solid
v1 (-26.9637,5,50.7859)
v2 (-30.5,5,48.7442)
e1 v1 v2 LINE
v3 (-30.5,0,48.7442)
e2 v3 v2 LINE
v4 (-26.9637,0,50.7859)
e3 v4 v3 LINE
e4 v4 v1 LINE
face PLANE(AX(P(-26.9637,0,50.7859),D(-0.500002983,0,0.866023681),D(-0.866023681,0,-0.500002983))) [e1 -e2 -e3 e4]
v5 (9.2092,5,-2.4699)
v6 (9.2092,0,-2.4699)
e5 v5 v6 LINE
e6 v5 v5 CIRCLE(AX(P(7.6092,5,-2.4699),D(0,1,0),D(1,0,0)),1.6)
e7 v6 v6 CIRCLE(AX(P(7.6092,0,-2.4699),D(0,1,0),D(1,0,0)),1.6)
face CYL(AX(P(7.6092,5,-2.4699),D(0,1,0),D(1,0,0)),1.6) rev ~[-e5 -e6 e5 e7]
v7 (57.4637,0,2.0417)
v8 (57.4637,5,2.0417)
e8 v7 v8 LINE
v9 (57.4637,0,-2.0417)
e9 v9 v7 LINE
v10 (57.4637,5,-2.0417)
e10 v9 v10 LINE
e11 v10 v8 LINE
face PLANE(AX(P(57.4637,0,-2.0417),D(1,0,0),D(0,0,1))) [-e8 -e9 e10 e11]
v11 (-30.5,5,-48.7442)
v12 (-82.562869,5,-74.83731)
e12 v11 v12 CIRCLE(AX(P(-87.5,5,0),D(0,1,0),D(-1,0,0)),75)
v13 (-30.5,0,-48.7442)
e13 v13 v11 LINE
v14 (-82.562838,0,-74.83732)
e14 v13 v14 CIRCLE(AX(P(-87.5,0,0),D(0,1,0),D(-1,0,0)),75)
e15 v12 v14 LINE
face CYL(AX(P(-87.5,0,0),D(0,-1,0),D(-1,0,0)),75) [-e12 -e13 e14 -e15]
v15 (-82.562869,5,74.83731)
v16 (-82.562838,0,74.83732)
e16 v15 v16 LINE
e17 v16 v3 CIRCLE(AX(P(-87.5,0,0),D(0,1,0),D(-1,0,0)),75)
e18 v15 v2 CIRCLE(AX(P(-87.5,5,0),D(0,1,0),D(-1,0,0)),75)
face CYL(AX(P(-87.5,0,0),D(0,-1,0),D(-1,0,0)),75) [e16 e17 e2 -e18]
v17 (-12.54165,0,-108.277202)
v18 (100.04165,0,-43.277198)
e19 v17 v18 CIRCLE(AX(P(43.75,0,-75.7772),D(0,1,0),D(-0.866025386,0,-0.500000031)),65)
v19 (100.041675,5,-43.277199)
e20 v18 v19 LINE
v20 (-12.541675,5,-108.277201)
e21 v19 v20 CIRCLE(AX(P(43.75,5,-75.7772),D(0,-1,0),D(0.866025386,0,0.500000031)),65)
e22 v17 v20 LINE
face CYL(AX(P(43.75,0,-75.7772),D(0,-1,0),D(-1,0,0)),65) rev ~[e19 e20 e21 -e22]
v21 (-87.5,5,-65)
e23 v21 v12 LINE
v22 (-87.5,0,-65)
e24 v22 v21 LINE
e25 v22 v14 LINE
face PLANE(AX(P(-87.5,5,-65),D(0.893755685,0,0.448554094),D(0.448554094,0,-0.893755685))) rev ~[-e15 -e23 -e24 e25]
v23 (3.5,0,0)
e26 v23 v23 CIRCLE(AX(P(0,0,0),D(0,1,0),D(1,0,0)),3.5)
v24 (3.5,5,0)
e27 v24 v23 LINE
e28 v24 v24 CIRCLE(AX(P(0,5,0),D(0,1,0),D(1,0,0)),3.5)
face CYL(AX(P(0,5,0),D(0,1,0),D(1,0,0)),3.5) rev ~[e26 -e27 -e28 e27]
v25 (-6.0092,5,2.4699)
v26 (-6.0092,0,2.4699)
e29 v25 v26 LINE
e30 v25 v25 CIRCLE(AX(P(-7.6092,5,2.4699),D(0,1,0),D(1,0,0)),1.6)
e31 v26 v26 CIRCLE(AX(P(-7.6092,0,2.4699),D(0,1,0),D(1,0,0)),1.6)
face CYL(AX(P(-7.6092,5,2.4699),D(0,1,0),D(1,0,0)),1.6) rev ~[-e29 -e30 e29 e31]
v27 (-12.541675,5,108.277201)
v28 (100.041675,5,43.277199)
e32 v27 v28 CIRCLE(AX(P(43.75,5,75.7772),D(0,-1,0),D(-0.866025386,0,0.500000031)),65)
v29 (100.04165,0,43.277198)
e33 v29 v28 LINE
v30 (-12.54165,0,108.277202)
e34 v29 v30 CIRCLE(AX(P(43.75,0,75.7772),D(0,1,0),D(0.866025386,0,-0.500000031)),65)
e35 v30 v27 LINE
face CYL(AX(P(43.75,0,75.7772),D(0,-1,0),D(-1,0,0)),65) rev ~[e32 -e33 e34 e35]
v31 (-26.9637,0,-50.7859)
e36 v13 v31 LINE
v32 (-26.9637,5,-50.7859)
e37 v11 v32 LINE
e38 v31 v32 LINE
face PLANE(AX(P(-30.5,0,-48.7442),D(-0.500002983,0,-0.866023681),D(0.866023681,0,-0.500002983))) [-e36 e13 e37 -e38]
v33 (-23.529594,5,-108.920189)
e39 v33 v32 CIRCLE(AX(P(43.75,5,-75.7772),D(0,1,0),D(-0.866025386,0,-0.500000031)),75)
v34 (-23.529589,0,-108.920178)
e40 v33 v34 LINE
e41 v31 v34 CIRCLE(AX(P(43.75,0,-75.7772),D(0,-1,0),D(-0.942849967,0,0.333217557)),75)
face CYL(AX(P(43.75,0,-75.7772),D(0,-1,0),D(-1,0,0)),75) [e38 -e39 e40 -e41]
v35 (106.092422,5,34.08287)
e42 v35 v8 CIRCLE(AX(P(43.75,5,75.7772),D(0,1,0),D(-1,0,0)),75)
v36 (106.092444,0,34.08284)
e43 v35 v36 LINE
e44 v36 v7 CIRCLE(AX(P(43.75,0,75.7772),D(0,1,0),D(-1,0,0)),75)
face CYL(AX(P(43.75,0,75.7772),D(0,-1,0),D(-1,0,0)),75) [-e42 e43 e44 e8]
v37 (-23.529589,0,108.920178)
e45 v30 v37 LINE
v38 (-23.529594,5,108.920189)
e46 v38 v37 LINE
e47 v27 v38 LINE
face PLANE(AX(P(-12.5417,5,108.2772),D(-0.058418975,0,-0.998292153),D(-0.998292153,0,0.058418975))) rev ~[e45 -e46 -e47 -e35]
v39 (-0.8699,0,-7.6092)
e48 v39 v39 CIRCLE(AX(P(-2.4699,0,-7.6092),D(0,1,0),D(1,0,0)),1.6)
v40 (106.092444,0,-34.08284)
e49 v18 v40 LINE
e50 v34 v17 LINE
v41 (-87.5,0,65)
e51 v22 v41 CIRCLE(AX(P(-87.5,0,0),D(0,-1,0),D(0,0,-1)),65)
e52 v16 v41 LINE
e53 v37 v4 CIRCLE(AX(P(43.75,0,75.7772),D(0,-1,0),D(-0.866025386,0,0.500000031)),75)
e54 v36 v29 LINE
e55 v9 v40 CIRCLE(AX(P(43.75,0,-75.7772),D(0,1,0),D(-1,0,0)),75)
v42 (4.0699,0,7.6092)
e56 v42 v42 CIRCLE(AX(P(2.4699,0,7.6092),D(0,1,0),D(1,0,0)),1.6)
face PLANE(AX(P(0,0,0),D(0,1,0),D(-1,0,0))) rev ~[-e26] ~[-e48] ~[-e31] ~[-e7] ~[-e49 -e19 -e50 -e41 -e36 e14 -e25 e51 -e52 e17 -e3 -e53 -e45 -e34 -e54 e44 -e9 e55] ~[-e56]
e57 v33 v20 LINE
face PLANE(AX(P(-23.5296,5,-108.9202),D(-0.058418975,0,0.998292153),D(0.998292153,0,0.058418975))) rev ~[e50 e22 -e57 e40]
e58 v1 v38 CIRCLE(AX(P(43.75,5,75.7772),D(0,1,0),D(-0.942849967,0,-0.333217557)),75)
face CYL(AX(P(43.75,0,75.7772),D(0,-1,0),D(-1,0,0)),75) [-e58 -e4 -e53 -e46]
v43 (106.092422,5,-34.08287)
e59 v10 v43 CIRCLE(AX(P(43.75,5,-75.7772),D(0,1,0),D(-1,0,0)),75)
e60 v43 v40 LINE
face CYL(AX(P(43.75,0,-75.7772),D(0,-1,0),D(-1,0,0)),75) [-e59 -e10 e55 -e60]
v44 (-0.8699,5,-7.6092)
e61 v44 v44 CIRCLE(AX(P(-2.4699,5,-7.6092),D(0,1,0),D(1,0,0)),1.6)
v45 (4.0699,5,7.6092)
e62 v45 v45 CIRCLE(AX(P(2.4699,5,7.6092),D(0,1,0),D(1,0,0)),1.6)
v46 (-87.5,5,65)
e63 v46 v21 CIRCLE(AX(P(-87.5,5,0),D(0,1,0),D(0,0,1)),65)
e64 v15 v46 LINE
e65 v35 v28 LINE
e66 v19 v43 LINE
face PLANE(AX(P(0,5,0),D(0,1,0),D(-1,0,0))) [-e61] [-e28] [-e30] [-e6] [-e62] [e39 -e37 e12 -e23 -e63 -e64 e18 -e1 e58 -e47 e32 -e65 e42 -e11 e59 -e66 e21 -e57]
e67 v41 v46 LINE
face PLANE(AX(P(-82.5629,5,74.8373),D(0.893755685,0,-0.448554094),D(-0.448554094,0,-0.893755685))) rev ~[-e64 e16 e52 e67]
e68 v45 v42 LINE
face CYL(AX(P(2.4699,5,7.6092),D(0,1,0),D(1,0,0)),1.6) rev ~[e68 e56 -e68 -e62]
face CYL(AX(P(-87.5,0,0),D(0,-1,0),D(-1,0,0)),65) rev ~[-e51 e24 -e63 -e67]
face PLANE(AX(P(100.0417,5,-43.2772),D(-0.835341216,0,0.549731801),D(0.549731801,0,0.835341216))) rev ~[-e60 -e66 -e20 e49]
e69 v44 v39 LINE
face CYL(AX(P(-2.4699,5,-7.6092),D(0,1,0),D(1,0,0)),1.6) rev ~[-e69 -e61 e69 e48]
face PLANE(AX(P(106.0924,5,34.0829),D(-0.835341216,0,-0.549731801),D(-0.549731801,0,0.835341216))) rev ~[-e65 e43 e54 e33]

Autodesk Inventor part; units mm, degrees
ref_plane "YZ Plane" through (0, 0, 0) normal (1, 0, 0) x (0, 1, 0)
ref_plane "XZ Plane" through (0, 0, 0) normal (0, 1, 0) x (-1, 0, 0)
ref_plane "XY Plane" through (0, 0, 0) normal (0, 0, 1) x (1, 0, 0)
sketch "Эскиз1" plane through (0, 0, 0) normal (0, 1, 0) x (-1, 0, 0)
  circle A0 centre (0, 0) radius 152.5
  line L0 (0, 0) -> (152.5, 0)
  circle A1 centre (87.5, 0) radius 65
  circle A2 centre (-43.75, 75.7772) radius 65
  circle A3 centre (-43.75, -75.7772) radius 65
  circle A4 centre (87.5, 0) radius 75
  circle A5 centre (-43.75, 75.7772) radius 75
  circle A6 centre (-43.75, -75.7772) radius 75
  line L1 (0, 0) -> (-76.25, 132.0689)
  line L2 (0, 0) -> (-76.25, -132.0689)
  line L3 (144.5, 48.7442) -> (30.5, -48.7442)
  line L4 (-114.4637, 100.7686) -> (26.9637, 50.7859)
  line L5 (-30.0363, -149.5128) -> (-57.4637, -2.0417)
  line L6 (30.5, -48.7442) -> (26.9637, -50.7859)
  line L7 (26.9637, 50.7859) -> (30.5, 48.7442)
  line L8 (-57.4637, -2.0417) -> (-57.4637, 2.0417)
  line L9 (87.5, -75) -> (87.5, 75)
  line L10 (21.2019, 113.2772) -> (-108.7019, 38.2772)
  line L11 (-108.7019, -38.2772) -> (21.2019, -113.2772)
  point P0 (14.0693, 24.3687)
  point P1 (-28.1386, 0)
  point P2 (14.0693, -24.3687)
  point P3 (12.5, 0)
  point P4 (22.5, 0)
  point P5 (152.5, 0)
  point P6 (-6.25, 10.8253)
  point P7 (-11.25, 19.4856)
  point P8 (-76.25, 132.0689)
  point P9 (-114.4637, 100.7686)
  point P10 (-6.25, -10.8253)
  point P11 (-11.25, -19.4856)
  point P12 (-76.25, -132.0689)
  point P13 (-30.0363, -149.5128)
  point P14 (-114.4637, -100.7686)
  point P15 (-30.0363, 149.5128)
  point P16 (144.5, -48.7442)
  point P17 (152.5, 0)
  point P18 (136.9, 42.245)
  point P19 (17.5352, 54.1181)
  point P20 (-105.0352, 97.4364)
  point P21 (-114.4637, 100.7686)
  point P22 (-57.4637, -2.0417)
  point P23 (-55.6352, -11.8731)
  point P24 (-31.8648, -139.6814)
  point P25 (-30.0363, -149.5128)
  point P26 (38.1, -42.245)
  point P27 (87.5, -65)
  point P28 (87.5, 65)
  point P29 (12.5417, 108.2772)
  point P30 (-100.0417, 43.2772)
  point P31 (-57.4637, -2.0417)
  point P32 (-100.0417, -43.2772)
  point P33 (12.5417, -108.2772)
  dimension "d0" = 305
  dimension "d1" = 130
  dimension "d2" = 0
  dimension "d5" = 360
  dimension "d7" = 150
  dimension "d10" = 360
  dimension "d16" = 360
  dimension "d18" = 0
  dimension "d21" = 360
  dimension "d25" = 360
  dimension "d48" = 360
extrude "Выдавливание1" add sketch "Эскиз1" along normal blind 5 contours L9 A4 L3 A1 | L9 A1 L0 A4 | A1 L3 A4 L0 | A5 L4 A2 L10 | A4 L0 L1 A5 L7 | L11 A3 L2 A6 | L6 A6 L2 L0 A4 | L10 A2 L1 A5 | A5 L1 A2 L4 | L11 A6 L5 A3 | L2 A6 L8 A5 L1 | L5 A6 L2 A3 picked at (58.9785, -61.9188) picked at (22.0957, 93.4205) picked at (-83.1125, -20.1174)
sketch "Эскиз4" plane through (0, 5, 0) normal (0, 1, 0) x (1, 0, 0)
  circle A0 centre (0, 0) radius 3.5
  dimension "d43" = 7
extrude "Выдавливание4" cut sketch "Эскиз4" against normal blind 140
sketch "Эскиз5" plane through (0, 5, 0) normal (0, 1, 0) x (1, 0, 0)
  circle A0 centre (0, 0) radius 3.5 projected
  arc A1 (-87.5, -65) -> (-87.5, 65) centre (-87.5, 0) ccw projected
  line L0 (-87.5, -65) -> (-87.5, -69)
  line L1 (-87.5, -65) -> (-87.5, -75) projected
  circle A2 centre (0, 0) radius 111.4327
  circle A3 centre (0, 0) radius 192.7389
  dimension "d51" = 4
extrude "Выдавливание5" cut sketch "Эскиз5" against normal through all contours A3
sketch "Эскиз6" plane through (0, 5, 0) normal (0, 1, 0) x (1, 0, 0)
  line L0 (103.5058, 41.2772) -> (100.0417, 43.2772) projected
  arc A0 (57.4637, 2.0417) -> (106.0924, 34.0829) centre (43.75, 75.7772) ccw projected
  line L1 (100.0417, 43.2772) -> (106.0924, 34.0829)
  line L2 (-87.5, 65) -> (-82.5629, 74.8373)
  line L3 (-12.5417, -108.2772) -> (-23.5296, -108.9202)
  line L4 (100.0417, -43.2772) -> (103.5058, -41.2772) projected
  line L5 (106.0924, -34.0829) -> (100.0417, -43.2772)
  line L6 (-23.5296, 108.9202) -> (-12.5417, 108.2772)
  line L7 (-82.5629, -74.8373) -> (-87.5, -65)
  arc A1 (-12.5417, 108.2772) -> (100.0417, 43.2772) centre (43.75, 75.7772) ccw projected
  arc A2 (-82.5629, 74.8373) -> (-87.5, 69) centre (0, 0) ccw projected
  line L8 (-87.5, 69) -> (-87.5, 65) projected
  arc A3 (-87.5, -65) -> (-87.5, 65) centre (-87.5, 0) ccw projected
  line L9 (-87.5, -65) -> (-87.5, -69) projected
  arc A4 (-87.5, -69) -> (-82.5629, -74.8373) centre (0, 0) ccw projected
  arc A5 (-82.5629, -74.8373) -> (-30.5, -48.7442) centre (-87.5, 0) ccw projected
  line L10 (-30.5, -48.7442) -> (-26.9637, -50.7859) projected
  arc A6 (-26.9637, -50.7859) -> (-23.5296, -108.9202) centre (43.75, -75.7772) ccw projected
  arc A7 (-23.5296, -108.9202) -> (-16.0058, -110.2772) centre (0, 0) ccw projected
  line L11 (-16.0058, -110.2772) -> (-12.5417, -108.2772) projected
  arc A8 (100.0417, -43.2772) -> (-12.5417, -108.2772) centre (43.75, -75.7772) ccw projected
  line L12 (100.0417, -43.2772) -> (103.5058, -41.2772) projected
  arc A9 (103.5058, -41.2772) -> (106.0924, -34.0829) centre (0, 0) ccw projected
  arc A10 (106.0924, -34.0829) -> (57.4637, -2.0417) centre (43.75, -75.7772) ccw projected
  line L13 (57.4637, -2.0417) -> (57.4637, 2.0417) projected
  arc A11 (57.4637, 2.0417) -> (106.0924, 34.0829) centre (43.75, 75.7772) ccw projected
  arc A12 (106.0924, 34.0829) -> (103.5058, 41.2772) centre (0, 0) ccw projected
  line L14 (103.5058, 41.2772) -> (100.0417, 43.2772) projected
  arc A13 (-12.5417, 108.2772) -> (100.0417, 43.2772) centre (43.75, 75.7772) ccw projected
  line L15 (-12.5417, 108.2772) -> (-16.0058, 110.2772) projected
  arc A14 (-16.0058, 110.2772) -> (-23.5296, 108.9202) centre (0, 0) ccw projected
  arc A15 (-23.5296, 108.9202) -> (-26.9637, 50.7859) centre (43.75, 75.7772) ccw projected
  line L16 (-26.9637, 50.7859) -> (-30.5, 48.7442) projected
  arc A16 (-30.5, 48.7442) -> (-82.5629, 74.8373) centre (-87.5, 0) ccw projected
  circle A17 centre (0, 0) radius 3.5 projected
  point P0 (-12.5417, 108.2772)
  point P1 (106.0924, 34.0829)
  dimension "d56" = 360
  dimension "d60" = 360
extrude "Выдавливание6" cut sketch "Эскиз6" against normal through all contours A12 L1 L0 | L6 A14 L15 | A9 L4 L5 | L2 L8 A2 | L11 A7 L3 | L7 A4 L9
sketch "Эскиз7" plane through (0, 5, 0) normal (0, 1, 0) x (1, 0, 0)
  circle A0 centre (7.6092, 2.4699) radius 1.6
  circle A1 centre (-7.6092, -2.4699) radius 1.6
  circle A2 centre (-2.4699, 7.6092) radius 1.6
  circle A3 centre (0, 0) radius 3.1
  circle A4 centre (2.4699, -7.6092) radius 1.6
extrude "Выдавливание7" cut sketch "Эскиз7" against normal through all contours A0 | A1 | A2 | A4
sketch "Эскиз8" plane through (0, 5, 0) normal (0, 1, 0) x (1, 0, 0)
  circle A0 centre (-2.4699, 7.6092) radius 1.6 projected
  circle A1 centre (7.6092, 2.4699) radius 1.6 projected
  circle A2 centre (-7.6092, -2.4699) radius 1.6 projected
  circle A3 centre (2.4699, -7.6092) radius 1.6 projected
  line L0 (-23.5296, -108.9202) -> (-12.5417, -108.2772) projected
  arc A4 (100.0417, -43.2772) -> (-12.5417, -108.2772) centre (43.75, -75.7772) ccw projected
  line L1 (100.0417, -43.2772) -> (106.0924, -34.0829) projected
  arc A5 (106.0924, -34.0829) -> (57.4637, -2.0417) centre (43.75, -75.7772) ccw projected
  line L2 (57.4637, -2.0417) -> (57.4637, 2.0417) projected
  arc A6 (57.4637, 2.0417) -> (106.0924, 34.0829) centre (43.75, 75.7772) ccw projected
  line L3 (106.0924, 34.0829) -> (100.0417, 43.2772) projected
  arc A7 (-12.5417, 108.2772) -> (100.0417, 43.2772) centre (43.75, 75.7772) ccw projected
  line L4 (-12.5417, 108.2772) -> (-23.5296, 108.9202) projected
  arc A8 (-23.5296, 108.9202) -> (-26.9637, 50.7859) centre (43.75, 75.7772) ccw projected
  line L5 (-26.9637, 50.7859) -> (-30.5, 48.7442) projected
  arc A9 (-30.5, 48.7442) -> (-82.5629, 74.8373) centre (-87.5, 0) ccw projected
  line L6 (-82.5629, 74.8373) -> (-87.5, 65) projected
  arc A10 (-87.5, -65) -> (-87.5, 65) centre (-87.5, 0) ccw projected
  line L7 (-87.5, -65) -> (-82.5629, -74.8373) projected
  arc A11 (-82.5629, -74.8373) -> (-30.5, -48.7442) centre (-87.5, 0) ccw projected
  line L8 (-30.5, -48.7442) -> (-26.9637, -50.7859) projected
  arc A12 (-26.9637, -50.7859) -> (-23.5296, -108.9202) centre (43.75, -75.7772) ccw projected
  circle A13 centre (0, 0) radius 3.5 projected
properties part number "сюрикен 2 dthcbz"
